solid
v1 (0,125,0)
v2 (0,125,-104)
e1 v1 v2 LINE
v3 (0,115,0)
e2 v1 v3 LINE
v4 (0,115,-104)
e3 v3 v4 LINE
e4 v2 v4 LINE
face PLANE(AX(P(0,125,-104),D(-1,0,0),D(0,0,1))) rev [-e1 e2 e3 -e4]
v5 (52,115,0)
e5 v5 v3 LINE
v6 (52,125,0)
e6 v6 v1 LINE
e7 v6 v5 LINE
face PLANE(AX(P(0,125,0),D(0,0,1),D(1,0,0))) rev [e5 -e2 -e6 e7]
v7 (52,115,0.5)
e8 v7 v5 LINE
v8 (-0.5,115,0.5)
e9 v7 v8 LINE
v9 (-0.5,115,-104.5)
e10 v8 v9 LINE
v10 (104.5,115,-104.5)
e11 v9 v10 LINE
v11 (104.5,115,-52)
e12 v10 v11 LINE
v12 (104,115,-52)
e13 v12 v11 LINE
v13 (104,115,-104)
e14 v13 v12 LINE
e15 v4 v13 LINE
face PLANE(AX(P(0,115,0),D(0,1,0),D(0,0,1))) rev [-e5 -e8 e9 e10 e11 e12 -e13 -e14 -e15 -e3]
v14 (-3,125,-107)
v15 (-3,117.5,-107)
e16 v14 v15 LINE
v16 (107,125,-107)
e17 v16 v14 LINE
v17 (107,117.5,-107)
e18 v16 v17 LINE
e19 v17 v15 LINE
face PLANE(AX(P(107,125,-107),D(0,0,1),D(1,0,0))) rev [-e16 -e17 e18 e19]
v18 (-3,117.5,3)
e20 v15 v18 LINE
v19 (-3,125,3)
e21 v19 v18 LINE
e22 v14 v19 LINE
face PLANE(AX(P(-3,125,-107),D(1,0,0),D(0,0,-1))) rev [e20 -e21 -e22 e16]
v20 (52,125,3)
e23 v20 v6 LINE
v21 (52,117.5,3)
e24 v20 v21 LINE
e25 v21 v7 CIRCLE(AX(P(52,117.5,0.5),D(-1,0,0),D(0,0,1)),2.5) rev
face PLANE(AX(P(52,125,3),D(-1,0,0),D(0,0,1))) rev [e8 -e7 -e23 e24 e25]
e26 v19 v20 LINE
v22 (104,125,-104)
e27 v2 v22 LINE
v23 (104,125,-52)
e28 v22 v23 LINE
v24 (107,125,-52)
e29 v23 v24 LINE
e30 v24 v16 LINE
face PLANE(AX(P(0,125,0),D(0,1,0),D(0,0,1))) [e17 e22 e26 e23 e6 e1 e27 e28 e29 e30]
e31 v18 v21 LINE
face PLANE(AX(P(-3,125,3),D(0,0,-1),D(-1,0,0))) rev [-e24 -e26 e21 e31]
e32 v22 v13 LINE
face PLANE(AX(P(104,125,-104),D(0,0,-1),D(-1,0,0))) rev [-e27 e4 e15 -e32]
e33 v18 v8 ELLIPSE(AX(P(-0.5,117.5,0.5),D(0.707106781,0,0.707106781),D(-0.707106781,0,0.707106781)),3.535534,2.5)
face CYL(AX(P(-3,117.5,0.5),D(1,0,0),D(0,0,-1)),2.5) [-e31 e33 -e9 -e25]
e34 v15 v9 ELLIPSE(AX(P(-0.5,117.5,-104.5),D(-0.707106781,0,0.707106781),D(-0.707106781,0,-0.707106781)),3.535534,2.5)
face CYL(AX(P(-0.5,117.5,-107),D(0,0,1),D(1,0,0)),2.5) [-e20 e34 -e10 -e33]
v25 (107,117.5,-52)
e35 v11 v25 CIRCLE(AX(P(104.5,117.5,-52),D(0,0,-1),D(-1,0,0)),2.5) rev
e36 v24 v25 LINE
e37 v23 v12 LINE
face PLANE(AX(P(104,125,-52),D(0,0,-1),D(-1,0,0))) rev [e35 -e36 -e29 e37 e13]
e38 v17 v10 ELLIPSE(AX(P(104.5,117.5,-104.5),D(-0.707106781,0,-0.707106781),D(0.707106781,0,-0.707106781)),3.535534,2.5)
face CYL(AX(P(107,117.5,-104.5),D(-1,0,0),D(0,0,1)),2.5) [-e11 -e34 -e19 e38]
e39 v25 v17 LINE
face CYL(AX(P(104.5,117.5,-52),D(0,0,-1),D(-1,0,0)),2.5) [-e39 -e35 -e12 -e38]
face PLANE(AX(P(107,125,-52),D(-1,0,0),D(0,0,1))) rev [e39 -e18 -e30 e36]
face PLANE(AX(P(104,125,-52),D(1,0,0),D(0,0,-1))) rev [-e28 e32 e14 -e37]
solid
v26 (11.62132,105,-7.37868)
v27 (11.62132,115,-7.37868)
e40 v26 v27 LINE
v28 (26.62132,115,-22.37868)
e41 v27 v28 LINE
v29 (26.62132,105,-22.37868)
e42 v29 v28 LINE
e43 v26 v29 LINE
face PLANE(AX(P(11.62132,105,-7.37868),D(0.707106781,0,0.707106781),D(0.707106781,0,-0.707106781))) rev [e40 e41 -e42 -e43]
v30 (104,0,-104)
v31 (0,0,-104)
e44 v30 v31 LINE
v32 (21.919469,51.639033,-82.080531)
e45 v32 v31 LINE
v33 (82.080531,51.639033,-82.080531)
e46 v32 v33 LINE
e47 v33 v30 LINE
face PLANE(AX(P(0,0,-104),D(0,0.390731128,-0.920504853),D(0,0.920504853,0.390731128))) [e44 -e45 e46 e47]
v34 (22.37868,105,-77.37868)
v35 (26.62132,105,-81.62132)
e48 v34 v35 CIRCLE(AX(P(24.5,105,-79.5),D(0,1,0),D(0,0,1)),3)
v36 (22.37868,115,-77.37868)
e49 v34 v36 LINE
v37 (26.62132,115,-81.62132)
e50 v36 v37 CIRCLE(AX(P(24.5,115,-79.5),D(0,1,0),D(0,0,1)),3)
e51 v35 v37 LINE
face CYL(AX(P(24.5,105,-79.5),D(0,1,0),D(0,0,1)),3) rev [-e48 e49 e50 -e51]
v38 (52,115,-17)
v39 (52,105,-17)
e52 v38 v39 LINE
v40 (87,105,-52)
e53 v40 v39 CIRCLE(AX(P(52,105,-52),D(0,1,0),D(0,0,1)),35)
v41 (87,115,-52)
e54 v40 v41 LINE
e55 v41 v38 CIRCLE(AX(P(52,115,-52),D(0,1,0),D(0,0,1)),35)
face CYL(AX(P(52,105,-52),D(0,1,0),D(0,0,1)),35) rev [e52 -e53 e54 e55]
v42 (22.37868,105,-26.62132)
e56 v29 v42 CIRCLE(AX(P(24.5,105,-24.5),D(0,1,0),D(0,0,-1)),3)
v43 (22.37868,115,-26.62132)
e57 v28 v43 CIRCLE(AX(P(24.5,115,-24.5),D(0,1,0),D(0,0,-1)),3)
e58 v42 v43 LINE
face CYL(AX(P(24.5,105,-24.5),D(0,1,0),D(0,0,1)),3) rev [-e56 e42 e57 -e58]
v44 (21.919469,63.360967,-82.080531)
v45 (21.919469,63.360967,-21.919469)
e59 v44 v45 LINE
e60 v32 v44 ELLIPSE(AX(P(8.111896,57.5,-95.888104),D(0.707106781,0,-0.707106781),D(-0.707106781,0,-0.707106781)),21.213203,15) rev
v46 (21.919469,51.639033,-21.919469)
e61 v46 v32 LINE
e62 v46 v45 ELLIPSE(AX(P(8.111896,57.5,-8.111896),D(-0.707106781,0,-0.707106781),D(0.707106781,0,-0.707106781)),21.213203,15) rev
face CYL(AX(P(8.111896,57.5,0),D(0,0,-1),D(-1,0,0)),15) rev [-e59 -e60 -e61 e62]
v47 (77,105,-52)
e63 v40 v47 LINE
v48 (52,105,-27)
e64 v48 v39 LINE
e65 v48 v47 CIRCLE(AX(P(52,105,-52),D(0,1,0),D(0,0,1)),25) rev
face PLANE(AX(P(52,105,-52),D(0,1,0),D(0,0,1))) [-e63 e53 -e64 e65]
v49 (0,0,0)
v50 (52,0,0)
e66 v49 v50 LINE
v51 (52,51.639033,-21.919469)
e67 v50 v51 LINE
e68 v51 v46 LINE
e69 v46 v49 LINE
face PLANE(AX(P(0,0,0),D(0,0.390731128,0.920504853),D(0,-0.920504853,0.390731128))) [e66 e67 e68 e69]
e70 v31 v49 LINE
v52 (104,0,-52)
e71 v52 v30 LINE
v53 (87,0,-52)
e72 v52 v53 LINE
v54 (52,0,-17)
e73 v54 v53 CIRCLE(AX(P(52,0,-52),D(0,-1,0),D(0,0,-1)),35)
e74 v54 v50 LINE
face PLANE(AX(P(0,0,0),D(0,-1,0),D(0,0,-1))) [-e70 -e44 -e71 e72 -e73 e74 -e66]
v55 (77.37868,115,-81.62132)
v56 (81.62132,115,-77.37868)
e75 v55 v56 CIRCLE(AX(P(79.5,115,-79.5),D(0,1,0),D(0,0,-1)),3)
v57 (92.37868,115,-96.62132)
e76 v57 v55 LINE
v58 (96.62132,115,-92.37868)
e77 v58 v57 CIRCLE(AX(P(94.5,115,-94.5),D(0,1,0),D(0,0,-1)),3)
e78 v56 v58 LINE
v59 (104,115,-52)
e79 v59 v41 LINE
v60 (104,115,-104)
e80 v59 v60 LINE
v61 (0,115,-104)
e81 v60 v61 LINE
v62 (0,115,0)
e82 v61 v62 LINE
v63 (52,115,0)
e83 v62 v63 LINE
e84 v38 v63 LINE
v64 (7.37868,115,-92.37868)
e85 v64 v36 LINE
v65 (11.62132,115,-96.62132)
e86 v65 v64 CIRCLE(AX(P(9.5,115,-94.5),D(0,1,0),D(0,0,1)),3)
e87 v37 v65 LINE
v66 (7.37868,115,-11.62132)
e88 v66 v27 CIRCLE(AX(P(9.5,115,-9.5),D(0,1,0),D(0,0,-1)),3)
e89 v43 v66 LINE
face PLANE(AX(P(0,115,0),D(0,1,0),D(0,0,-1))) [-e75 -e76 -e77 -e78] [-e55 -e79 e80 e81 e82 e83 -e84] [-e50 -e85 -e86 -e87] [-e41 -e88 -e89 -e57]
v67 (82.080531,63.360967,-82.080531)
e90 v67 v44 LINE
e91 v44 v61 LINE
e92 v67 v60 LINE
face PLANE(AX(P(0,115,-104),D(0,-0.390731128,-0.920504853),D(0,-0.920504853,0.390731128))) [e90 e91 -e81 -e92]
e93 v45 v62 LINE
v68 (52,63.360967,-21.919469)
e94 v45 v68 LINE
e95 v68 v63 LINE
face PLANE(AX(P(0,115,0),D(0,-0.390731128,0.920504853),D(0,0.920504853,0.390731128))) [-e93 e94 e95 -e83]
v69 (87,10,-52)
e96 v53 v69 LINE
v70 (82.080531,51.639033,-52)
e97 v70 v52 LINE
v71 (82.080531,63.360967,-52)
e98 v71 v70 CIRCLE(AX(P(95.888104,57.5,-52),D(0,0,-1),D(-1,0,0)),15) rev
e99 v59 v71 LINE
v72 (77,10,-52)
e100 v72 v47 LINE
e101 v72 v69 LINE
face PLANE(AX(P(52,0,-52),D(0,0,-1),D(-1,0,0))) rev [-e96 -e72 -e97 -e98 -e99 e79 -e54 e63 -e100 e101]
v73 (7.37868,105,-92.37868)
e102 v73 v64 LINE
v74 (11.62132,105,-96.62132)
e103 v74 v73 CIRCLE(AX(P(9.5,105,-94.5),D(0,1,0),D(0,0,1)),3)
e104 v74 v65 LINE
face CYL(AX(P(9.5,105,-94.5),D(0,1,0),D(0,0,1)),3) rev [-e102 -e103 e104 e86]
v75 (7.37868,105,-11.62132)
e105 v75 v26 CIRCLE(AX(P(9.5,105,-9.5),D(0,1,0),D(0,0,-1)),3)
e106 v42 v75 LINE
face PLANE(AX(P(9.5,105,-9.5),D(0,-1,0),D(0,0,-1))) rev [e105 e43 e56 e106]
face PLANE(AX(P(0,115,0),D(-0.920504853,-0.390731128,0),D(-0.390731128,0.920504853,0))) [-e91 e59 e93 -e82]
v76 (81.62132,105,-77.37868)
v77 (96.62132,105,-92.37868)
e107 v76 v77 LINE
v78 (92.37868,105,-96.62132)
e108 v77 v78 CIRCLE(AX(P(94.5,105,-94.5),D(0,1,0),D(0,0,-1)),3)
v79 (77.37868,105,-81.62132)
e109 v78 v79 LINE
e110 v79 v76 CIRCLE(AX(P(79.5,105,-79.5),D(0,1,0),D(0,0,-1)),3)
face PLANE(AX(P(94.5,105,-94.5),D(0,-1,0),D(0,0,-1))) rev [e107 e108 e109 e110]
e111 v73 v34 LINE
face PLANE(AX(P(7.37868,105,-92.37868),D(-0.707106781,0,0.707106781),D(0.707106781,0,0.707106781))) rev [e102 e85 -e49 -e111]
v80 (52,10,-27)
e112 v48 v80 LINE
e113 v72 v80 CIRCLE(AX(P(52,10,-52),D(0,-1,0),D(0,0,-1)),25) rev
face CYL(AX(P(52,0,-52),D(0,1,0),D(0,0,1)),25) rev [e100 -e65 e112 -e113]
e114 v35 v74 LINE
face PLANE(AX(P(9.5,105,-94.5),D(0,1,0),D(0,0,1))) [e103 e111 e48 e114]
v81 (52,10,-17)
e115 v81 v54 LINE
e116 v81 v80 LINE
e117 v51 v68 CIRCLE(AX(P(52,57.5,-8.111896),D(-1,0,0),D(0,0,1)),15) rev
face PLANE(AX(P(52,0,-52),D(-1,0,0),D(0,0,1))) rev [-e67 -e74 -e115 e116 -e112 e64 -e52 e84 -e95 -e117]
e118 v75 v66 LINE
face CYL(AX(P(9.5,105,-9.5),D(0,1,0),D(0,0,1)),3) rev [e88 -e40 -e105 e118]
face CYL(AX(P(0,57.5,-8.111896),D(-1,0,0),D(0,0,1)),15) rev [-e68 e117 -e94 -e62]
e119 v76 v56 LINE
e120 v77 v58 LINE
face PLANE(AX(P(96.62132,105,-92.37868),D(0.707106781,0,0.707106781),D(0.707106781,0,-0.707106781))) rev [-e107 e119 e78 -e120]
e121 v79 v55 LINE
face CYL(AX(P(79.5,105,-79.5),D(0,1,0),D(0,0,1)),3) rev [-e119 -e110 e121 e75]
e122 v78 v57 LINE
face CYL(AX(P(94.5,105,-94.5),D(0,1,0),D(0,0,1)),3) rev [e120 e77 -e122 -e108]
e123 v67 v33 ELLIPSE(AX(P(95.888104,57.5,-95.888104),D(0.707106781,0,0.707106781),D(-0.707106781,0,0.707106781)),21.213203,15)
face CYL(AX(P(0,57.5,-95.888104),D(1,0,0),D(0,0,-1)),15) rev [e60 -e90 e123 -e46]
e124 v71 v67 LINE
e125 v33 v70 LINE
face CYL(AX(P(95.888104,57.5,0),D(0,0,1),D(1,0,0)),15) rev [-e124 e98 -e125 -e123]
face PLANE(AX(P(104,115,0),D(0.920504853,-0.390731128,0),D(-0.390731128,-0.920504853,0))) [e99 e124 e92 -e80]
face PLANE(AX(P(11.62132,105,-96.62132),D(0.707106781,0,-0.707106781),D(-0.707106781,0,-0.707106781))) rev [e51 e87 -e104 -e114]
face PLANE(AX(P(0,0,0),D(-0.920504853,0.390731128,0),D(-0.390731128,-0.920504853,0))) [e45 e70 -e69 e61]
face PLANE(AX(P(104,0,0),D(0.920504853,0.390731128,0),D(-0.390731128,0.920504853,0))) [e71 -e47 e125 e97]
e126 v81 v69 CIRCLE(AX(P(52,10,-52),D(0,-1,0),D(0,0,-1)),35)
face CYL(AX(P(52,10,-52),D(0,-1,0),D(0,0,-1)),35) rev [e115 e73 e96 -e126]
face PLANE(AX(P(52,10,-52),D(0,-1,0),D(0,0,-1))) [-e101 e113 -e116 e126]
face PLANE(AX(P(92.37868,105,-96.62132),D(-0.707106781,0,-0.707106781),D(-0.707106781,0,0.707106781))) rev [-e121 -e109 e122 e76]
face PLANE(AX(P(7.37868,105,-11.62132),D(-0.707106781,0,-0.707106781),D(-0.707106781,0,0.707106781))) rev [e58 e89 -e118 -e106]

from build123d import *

# Parameters (mm, degrees)
SKETCH2_W               = 104
SKETCH2_H               = 104
BOSS_EXTRUDE1_DEPTH     = 57.5
BOSS_EXTRUDE1_TAPER     = 23
CUT_EXTRUDE1_DEPTH      = 187.700294763
CUT_EXTRUDE1_DEPTH_BACK = 187.700294763
SKETCH4_R               = 25
FILLET1_R               = 15
SKETCH5_R               = 35
CUT_EXTRUDE2_DEPTH      = 10
CUT_EXTRUDE3_START      = -10
SKETCH6_R               = 35
CUT_EXTRUDE3_DEPTH      = 10
SKETCH7_W               = 52
SKETCH7_H               = 52
CUT_EXTRUDE4_DEPTH      = 187.700294763
BOSS_EXTRUDE3_DEPTH     = 10
FILLET12_R              = 2.5
CUT_EXTRUDE5_DEPTH      = 10


with BuildPart() as part:
    # Sketch2 → Boss-Extrude1 (new body)
    with BuildSketch(Plane(origin=(0, 0, 0), x_dir=(1, 0, 0), z_dir=(0, 1, 0))):
        with Locations((52, 52)):
            Rectangle(SKETCH2_W, SKETCH2_H)
    extrude(amount=BOSS_EXTRUDE1_DEPTH, taper=BOSS_EXTRUDE1_TAPER)

    # Mirror2: part across plane


with BuildPart() as part_1:
    add(part.part)
    add(part.part.mirror(Plane(origin=(0, 57.5, 0), x_dir=(0, 0, 1), z_dir=(0, -1, 0))))

    # Sketch4 → Cut-Extrude1 (cut, two sides: drawn at the far end of the back side and taken through both)
    with BuildSketch(Plane(origin=(0, 115, 0), x_dir=(1, 0, 0), z_dir=(0, 1, 0)).offset(-CUT_EXTRUDE1_DEPTH_BACK)):
        with Locations(Location((52, 52, 0), (0, 0, 270))):
            Circle(SKETCH4_R)
    extrude(amount=CUT_EXTRUDE1_DEPTH + CUT_EXTRUDE1_DEPTH_BACK, mode=Mode.SUBTRACT)

    # Fillet1
    # the kernel refuses this fillet: 15 mm, written as the material it adds along each edge
    with BuildSketch(Plane(origin=(24.407301932, 57.5, -95.510503676), x_dir=(-0.39073112848927455, -0.9205048534524399, 0), z_dir=(0, 0, 1))) as fillet1_piece_1_section:
        with BuildLine():
            CenterArc((FILLET1_R * 0.42447481621, -FILLET1_R), FILLET1_R, 90, 46)
            Line((-FILLET1_R * 0.294864984129, -FILLET1_R * 0.305341629541), (0, 0))
            Line((0, 0), (FILLET1_R * 0.42447481621, 0))
        make_face()
    fillet1_piece_1 = extrude(amount=87.021007352, mode=Mode.PRIVATE)
    fillet1_piece_1 = fillet1_piece_1 - Plane(origin=(24.407301932, 57.5, -8.111896271), x_dir=(0, -0.39073112848927466, -0.9205048534524399), z_dir=(-1, 0, 0)) * Cylinder(15, 200, mode=Mode.PRIVATE)
    fillet1_piece_1 = fillet1_piece_1 - Plane(origin=(24.407301932, 57.5, -95.888103729), x_dir=(0, -0.3907311284892748, 0.9205048534524398), z_dir=(1, 0, 0)) * Cylinder(15, 200, mode=Mode.PRIVATE)
    add(fillet1_piece_1)
    with BuildSketch(Plane(origin=(8.489496324, 57.5, -24.407301932), x_dir=(0, -0.9205048534524399, 0.39073112848927455), z_dir=(1, 0, 0))) as fillet1_piece_2_section:
        with BuildLine():
            CenterArc((FILLET1_R * 0.42447481621, -FILLET1_R), FILLET1_R, 90, 46)
            Line((-FILLET1_R * 0.294864984129, -FILLET1_R * 0.305341629541), (0, 0))
            Line((0, 0), (FILLET1_R * 0.42447481621, 0))
        make_face()
    fillet1_piece_2 = extrude(amount=87.021007352, mode=Mode.PRIVATE)
    fillet1_piece_2 = fillet1_piece_2 - Plane(origin=(95.888103729, 57.5, -24.407301932), x_dir=(-0.9205048534524398, -0.3907311284892748, 0), z_dir=(0, 0, 1)) * Cylinder(15, 200, mode=Mode.PRIVATE)
    fillet1_piece_2 = fillet1_piece_2 - Plane(origin=(8.111896271, 57.5, -24.407301932), x_dir=(0.9205048534524399, -0.39073112848927466, 0), z_dir=(0, 0, -1)) * Cylinder(15, 200, mode=Mode.PRIVATE)
    add(fillet1_piece_2)
    with BuildSketch(Plane(origin=(79.592698068, 57.5, -8.489496324), x_dir=(0.39073112848927455, -0.9205048534524399, 0), z_dir=(0, 0, -1))) as fillet1_piece_3_section:
        with BuildLine():
            CenterArc((FILLET1_R * 0.42447481621, -FILLET1_R), FILLET1_R, 90, 46)
            Line((-FILLET1_R * 0.294864984129, -FILLET1_R * 0.305341629541), (0, 0))
            Line((0, 0), (FILLET1_R * 0.42447481621, 0))
        make_face()
    fillet1_piece_3 = extrude(amount=87.021007352, mode=Mode.PRIVATE)
    fillet1_piece_3 = fillet1_piece_3 - Plane(origin=(79.592698068, 57.5, -8.111896271), x_dir=(0, -0.39073112848927466, -0.9205048534524399), z_dir=(-1, 0, 0)) * Cylinder(15, 200, mode=Mode.PRIVATE)
    fillet1_piece_3 = fillet1_piece_3 - Plane(origin=(79.592698068, 57.5, -95.888103729), x_dir=(0, -0.3907311284892748, 0.9205048534524398), z_dir=(1, 0, 0)) * Cylinder(15, 200, mode=Mode.PRIVATE)
    add(fillet1_piece_3)
    with BuildSketch(Plane(origin=(95.510503676, 57.5, -79.592698068), x_dir=(0, -0.9205048534524399, -0.39073112848927455), z_dir=(-1, 0, 0))) as fillet1_piece_4_section:
        with BuildLine():
            CenterArc((FILLET1_R * 0.42447481621, -FILLET1_R), FILLET1_R, 90, 46)
            Line((-FILLET1_R * 0.294864984129, -FILLET1_R * 0.305341629541), (0, 0))
            Line((0, 0), (FILLET1_R * 0.42447481621, 0))
        make_face()
    fillet1_piece_4 = extrude(amount=87.021007352, mode=Mode.PRIVATE)
    fillet1_piece_4 = fillet1_piece_4 - Plane(origin=(95.888103729, 57.5, -79.592698068), x_dir=(-0.9205048534524398, -0.3907311284892748, 0), z_dir=(0, 0, 1)) * Cylinder(15, 200, mode=Mode.PRIVATE)
    fillet1_piece_4 = fillet1_piece_4 - Plane(origin=(8.111896271, 57.5, -79.592698068), x_dir=(0.9205048534524399, -0.39073112848927466, 0), z_dir=(0, 0, -1)) * Cylinder(15, 200, mode=Mode.PRIVATE)
    add(fillet1_piece_4)

    # Sketch5 → Cut-Extrude2 (cut)
    with BuildSketch(Plane(origin=(0, 115, 0), x_dir=(1, 0, 0), z_dir=(0, 1, 0))):
        with Locations(Location((52, 52, 0), (0, 0, 270))):
            Circle(SKETCH5_R)
    extrude(amount=-CUT_EXTRUDE2_DEPTH, mode=Mode.SUBTRACT)

    # Sketch6 → Cut-Extrude3 (cut)
    with BuildSketch(Plane.XZ.offset(CUT_EXTRUDE3_START)):
        with Locations(Location((52, -52, 0), (0, 0, 90))):
            Circle(SKETCH6_R)
    extrude(amount=CUT_EXTRUDE3_DEPTH, mode=Mode.SUBTRACT)

    # Sketch7 → Cut-Extrude4 (cut, through all)
    with BuildSketch(Plane(origin=(0, 115, 0), x_dir=(1, 0, 0), z_dir=(0, 1, 0))):
        with Locations((78, 26)):
            Rectangle(SKETCH7_W, SKETCH7_H)
    extrude(amount=-CUT_EXTRUDE4_DEPTH, mode=Mode.SUBTRACT)

    # Sketch10 → Cut-Extrude5 (cut)
    with BuildSketch(Plane(origin=(0, 115, 0), x_dir=(1, 0, 0), z_dir=(0, 1, 0))):
        with BuildLine():
            Line((11.621320344, 96.621320344), (26.621320344, 81.621320344))
            ThreePointArc((26.621320344, 81.621320344), (26.621320344, 77.378679656), (22.378679656, 77.378679656))
            Line((22.378679656, 77.378679656), (7.378679656, 92.378679656))
            ThreePointArc((7.378679656, 92.378679656), (7.378679656, 96.621320344), (11.621320344, 96.621320344))
        make_face()
        with BuildLine():
            Line((92.378679656, 96.621320344), (77.378679656, 81.621320344))
            ThreePointArc((77.378679656, 81.621320344), (77.378679656, 77.378679656), (81.621320344, 77.378679656))
            Line((81.621320344, 77.378679656), (96.621320344, 92.378679656))
            ThreePointArc((96.621320344, 92.378679656), (96.621320344, 96.621320344), (92.378679656, 96.621320344))
        make_face()
        with BuildLine():
            Line((11.621320344, 7.378679656), (26.621320344, 22.378679656))
            ThreePointArc((26.621320344, 22.378679656), (26.621320344, 26.621320344), (22.378679656, 26.621320344))
            Line((22.378679656, 26.621320344), (7.378679656, 11.621320344))
            ThreePointArc((7.378679656, 11.621320344), (7.378679656, 7.378679656), (11.621320344, 7.378679656))
        make_face()
    extrude(amount=-CUT_EXTRUDE5_DEPTH, mode=Mode.SUBTRACT)


with BuildPart() as body_2:
    # Sketch8 → Boss-Extrude3 (new body)
    with BuildSketch(Plane(origin=(0, 115, 0), x_dir=(1, 0, 0), z_dir=(0, 1, 0))):
        Polygon((104, 52), (104, 104), (0, 104), (0, 0), (52, 0), (52, -3), (-3, -3), (-3, 107), (107, 107), (107, 52), align=None)
    extrude(amount=BOSS_EXTRUDE3_DEPTH)

    # Fillet12
    fillet12_edges = [body_2.edges().sort_by_distance(p)[0] for p in [
        (24.5, 115, 3),
        (-3, 115, -52),
        (52, 115, -107),
        (107, 115, -79.5),
    ]]
    fillet(fillet12_edges, radius=FILLET12_R)


solid = Compound([part_1.part, body_2.part])
